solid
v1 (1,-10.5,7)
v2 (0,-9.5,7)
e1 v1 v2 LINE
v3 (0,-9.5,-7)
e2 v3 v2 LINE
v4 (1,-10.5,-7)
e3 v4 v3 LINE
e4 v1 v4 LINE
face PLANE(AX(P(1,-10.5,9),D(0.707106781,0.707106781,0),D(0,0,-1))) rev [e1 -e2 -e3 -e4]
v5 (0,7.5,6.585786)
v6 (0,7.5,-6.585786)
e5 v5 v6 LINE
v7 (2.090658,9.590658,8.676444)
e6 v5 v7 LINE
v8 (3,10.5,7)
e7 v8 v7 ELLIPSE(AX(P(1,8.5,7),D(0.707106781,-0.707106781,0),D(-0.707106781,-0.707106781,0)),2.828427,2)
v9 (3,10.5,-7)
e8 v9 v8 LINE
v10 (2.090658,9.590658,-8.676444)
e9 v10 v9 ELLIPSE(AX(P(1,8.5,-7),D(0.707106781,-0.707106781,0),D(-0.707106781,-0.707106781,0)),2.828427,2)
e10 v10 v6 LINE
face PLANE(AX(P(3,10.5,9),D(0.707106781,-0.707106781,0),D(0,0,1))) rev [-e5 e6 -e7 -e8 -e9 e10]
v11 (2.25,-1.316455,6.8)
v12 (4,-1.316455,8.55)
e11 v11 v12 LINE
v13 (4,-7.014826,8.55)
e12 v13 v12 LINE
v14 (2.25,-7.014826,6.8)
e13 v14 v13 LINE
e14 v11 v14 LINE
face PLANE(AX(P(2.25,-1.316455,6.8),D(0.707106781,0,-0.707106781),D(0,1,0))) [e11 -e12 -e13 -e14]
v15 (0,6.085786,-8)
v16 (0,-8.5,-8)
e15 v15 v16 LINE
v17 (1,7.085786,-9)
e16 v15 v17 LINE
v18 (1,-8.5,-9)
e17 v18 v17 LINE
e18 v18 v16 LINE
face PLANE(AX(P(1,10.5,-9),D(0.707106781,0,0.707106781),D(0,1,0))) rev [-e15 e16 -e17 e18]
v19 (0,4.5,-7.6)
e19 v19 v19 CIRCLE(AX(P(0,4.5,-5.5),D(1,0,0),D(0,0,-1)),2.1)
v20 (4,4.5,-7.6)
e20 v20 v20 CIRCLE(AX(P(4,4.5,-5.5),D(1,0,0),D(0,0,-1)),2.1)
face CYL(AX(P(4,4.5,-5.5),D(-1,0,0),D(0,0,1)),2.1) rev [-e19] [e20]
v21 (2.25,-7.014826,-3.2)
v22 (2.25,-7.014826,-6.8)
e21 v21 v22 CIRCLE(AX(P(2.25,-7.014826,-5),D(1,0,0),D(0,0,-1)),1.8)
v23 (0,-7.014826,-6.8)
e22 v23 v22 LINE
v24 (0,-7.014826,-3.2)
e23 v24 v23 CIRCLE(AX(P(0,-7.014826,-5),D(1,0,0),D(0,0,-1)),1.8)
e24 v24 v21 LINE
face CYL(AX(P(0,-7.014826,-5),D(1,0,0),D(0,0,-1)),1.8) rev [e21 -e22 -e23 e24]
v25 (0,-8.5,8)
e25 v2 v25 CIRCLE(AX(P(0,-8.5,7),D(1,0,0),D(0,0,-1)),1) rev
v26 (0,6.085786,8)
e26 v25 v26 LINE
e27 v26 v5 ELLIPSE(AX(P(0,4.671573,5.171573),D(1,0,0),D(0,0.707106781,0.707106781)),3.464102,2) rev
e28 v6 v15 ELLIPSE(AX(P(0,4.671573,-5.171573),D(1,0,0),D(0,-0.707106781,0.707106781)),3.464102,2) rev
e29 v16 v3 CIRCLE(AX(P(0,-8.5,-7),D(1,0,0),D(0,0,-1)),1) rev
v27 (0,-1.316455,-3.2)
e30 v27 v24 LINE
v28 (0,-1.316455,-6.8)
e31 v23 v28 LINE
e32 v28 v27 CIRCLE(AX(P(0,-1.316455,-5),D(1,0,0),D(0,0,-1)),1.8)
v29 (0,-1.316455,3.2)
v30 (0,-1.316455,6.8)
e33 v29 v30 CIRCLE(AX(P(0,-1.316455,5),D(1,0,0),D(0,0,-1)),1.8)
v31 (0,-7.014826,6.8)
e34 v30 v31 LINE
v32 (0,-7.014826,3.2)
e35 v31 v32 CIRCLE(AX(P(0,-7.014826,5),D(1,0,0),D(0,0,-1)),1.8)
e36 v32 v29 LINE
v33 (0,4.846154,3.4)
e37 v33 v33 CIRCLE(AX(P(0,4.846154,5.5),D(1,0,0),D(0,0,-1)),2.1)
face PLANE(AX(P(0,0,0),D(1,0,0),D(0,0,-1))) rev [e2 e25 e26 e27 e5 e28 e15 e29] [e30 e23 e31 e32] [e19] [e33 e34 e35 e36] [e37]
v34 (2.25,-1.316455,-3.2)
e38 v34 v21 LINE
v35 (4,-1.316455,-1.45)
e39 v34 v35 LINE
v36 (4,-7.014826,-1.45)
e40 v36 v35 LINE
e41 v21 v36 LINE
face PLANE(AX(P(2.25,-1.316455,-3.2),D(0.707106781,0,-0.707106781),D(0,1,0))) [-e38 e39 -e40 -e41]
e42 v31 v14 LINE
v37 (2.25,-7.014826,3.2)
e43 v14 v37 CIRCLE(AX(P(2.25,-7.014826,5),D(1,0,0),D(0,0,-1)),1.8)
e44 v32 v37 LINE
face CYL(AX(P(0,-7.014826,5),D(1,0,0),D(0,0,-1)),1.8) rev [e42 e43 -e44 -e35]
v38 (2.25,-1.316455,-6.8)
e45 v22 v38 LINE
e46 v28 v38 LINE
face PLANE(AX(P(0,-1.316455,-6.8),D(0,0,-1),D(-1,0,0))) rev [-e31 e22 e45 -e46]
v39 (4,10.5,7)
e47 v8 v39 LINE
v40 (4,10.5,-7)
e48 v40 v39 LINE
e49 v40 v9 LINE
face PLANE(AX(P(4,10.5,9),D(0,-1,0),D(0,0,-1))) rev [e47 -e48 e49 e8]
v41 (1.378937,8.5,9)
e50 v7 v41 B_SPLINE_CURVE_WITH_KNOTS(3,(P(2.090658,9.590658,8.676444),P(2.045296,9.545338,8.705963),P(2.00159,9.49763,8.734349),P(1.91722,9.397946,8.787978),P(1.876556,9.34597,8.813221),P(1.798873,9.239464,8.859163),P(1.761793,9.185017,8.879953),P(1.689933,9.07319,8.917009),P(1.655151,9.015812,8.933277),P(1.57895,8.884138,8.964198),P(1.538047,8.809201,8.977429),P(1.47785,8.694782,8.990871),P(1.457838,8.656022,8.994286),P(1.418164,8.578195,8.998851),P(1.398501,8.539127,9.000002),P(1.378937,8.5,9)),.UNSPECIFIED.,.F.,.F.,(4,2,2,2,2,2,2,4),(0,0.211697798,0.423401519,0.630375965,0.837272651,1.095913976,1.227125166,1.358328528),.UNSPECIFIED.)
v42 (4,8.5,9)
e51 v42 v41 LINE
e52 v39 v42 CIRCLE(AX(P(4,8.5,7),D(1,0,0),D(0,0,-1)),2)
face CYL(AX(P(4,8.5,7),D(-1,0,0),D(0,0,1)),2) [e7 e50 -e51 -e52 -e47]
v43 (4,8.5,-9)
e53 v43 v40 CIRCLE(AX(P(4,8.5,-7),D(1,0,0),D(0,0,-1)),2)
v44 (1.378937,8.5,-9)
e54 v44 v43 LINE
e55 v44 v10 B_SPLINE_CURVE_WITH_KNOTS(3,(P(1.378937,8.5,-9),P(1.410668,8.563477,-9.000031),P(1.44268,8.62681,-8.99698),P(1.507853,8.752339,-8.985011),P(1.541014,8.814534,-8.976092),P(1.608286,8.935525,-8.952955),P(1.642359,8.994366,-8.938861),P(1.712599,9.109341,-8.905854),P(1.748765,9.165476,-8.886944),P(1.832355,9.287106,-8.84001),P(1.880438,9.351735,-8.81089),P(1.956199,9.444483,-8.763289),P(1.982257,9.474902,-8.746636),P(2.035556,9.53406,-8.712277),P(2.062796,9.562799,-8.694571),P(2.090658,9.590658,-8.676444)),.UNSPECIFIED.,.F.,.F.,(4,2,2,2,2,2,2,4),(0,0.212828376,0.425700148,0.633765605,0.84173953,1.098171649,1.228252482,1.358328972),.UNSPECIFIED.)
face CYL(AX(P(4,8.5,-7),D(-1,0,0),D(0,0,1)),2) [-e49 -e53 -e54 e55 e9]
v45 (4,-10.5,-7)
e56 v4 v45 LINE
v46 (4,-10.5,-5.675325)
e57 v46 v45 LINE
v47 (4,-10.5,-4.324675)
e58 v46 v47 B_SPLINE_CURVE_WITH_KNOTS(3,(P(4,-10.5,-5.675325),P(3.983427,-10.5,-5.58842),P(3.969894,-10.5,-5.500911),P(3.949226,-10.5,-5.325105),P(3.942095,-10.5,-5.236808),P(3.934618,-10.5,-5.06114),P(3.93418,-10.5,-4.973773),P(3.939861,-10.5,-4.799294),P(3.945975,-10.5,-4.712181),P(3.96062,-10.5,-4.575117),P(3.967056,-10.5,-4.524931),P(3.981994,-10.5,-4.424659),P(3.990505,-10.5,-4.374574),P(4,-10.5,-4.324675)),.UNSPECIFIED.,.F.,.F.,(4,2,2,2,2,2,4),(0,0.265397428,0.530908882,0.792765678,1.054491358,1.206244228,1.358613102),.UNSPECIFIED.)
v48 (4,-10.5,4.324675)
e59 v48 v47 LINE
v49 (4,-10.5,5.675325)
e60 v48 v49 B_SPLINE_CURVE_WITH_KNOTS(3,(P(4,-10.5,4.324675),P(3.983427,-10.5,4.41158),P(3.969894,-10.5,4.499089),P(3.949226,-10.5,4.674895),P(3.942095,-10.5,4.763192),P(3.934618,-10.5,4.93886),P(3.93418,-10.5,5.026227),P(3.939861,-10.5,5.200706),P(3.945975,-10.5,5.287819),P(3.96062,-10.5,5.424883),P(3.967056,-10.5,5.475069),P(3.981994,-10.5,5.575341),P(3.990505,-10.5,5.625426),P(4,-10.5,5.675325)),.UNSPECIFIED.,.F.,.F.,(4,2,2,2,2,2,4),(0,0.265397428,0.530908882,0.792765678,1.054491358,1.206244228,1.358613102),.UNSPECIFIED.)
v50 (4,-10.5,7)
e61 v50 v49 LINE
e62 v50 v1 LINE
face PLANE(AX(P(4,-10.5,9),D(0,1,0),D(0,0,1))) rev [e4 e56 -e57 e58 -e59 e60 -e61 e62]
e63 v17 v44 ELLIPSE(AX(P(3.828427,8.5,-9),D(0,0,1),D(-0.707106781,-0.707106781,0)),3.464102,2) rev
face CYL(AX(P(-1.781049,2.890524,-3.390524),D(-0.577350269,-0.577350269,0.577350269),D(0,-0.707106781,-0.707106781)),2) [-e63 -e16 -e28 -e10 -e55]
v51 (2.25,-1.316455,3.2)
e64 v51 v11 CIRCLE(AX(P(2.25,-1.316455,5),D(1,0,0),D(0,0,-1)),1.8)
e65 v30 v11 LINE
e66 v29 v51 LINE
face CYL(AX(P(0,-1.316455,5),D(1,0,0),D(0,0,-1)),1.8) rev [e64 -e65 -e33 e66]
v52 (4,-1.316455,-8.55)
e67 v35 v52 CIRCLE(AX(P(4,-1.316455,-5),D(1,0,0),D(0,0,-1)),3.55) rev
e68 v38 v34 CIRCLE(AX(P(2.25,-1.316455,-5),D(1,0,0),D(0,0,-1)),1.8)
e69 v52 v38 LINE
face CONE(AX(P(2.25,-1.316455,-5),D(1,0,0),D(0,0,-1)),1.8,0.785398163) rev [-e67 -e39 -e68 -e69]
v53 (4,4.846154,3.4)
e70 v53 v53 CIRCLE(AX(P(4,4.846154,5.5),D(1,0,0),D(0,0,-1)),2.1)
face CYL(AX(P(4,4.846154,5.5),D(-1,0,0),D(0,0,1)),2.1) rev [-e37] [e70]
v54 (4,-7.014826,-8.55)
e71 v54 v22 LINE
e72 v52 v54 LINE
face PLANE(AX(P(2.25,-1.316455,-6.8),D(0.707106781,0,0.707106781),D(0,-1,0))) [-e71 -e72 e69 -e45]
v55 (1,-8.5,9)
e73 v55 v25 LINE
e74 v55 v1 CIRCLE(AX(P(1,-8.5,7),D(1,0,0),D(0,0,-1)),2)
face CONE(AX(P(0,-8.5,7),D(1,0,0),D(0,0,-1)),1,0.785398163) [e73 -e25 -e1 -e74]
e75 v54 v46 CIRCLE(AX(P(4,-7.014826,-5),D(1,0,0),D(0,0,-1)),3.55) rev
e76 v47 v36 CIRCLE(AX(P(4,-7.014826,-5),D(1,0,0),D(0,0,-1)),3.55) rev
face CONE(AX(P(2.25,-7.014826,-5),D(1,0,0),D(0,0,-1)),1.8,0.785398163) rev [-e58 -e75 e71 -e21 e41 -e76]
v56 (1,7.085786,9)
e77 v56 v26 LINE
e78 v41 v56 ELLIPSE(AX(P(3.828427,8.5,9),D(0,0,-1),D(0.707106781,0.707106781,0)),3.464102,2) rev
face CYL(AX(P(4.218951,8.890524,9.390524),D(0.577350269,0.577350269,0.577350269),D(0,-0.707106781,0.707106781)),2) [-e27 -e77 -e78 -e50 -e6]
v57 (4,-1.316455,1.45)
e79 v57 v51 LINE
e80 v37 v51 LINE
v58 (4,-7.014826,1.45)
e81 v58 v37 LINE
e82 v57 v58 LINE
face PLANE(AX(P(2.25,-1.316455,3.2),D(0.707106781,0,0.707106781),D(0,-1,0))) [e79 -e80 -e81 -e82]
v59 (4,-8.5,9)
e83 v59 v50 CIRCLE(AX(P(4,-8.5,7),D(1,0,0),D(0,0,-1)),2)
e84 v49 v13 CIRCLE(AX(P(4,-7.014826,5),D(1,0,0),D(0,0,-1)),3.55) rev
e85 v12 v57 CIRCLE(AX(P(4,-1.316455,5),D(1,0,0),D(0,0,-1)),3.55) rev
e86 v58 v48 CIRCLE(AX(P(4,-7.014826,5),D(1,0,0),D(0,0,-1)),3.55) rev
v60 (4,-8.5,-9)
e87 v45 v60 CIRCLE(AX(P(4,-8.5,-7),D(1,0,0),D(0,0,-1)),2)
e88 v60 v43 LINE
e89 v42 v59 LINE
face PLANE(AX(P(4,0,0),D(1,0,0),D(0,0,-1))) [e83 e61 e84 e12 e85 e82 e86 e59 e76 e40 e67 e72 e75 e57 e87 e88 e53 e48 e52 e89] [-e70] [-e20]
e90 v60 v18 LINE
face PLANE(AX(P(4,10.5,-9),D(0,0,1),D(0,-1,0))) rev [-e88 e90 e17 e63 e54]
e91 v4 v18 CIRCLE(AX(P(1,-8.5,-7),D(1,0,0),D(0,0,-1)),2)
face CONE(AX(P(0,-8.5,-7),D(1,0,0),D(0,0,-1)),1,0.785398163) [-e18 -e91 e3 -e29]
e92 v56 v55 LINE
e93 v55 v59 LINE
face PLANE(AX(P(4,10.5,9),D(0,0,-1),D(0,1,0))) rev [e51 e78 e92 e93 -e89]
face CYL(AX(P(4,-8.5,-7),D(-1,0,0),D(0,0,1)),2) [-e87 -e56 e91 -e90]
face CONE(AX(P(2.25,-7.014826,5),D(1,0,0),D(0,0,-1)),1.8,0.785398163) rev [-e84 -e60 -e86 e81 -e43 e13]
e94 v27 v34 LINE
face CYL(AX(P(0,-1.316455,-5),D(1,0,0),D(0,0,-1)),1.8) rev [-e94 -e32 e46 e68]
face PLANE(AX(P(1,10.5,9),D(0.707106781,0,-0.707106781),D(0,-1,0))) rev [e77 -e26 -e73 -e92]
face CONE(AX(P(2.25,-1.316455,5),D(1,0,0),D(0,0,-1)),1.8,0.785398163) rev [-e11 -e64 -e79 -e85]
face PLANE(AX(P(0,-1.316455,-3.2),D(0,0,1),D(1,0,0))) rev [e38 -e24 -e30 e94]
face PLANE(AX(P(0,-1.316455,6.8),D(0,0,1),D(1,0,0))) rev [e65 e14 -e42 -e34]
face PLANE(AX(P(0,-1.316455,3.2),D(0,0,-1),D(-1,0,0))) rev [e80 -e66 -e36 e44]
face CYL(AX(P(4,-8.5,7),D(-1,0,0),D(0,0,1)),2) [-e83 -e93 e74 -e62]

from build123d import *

# Parameters (mm, degrees)
SKETCH1_W           = 18
SKETCH1_H           = 21
SKETCH1_R           = 2.1
BOSS_EXTRUDE1_DEPTH = 4
CUT_EXTRUDE1_DEPTH  = 4
CHAMFER1_SIZE       = 1.75
FILLET1_R           = 2
CHAMFER2_SIZE       = 3
CHAMFER3_SIZE       = 1
FILLET2_R           = 2


with BuildPart() as part:
    # Sketch1 → Boss-Extrude1 (new body)
    with BuildSketch(Plane(origin=(0, 0, 0), x_dir=(0, 0, -1), z_dir=(1, 0, 0))):
        Rectangle(SKETCH1_W, SKETCH1_H)
        with Locations((5.5, 4.5)):
            Circle(SKETCH1_R, mode=Mode.SUBTRACT)
        with Locations((-5.5, 4.846153846)):
            Circle(SKETCH1_R, mode=Mode.SUBTRACT)
    extrude(amount=BOSS_EXTRUDE1_DEPTH)

    # Sketch2 → Cut-Extrude1 (cut)
    with BuildSketch(Plane(origin=(4, 0, 0), x_dir=(0, 0, -1), z_dir=(1, 0, 0))):
        with BuildLine():
            Line((6.8, -1.316455335), (6.8, -7.014826284))
            ThreePointArc((6.8, -7.014826284), (5, -8.814826284), (3.2, -7.014826284))
            Line((3.2, -7.014826284), (3.2, -1.316455335))
            ThreePointArc((3.2, -1.316455335), (5, 0.483544665), (6.8, -1.316455335))
        make_face()
        with BuildLine():
            Line((-3.2, -1.316455335), (-3.2, -7.014826284))
            ThreePointArc((-3.2, -7.014826284), (-5, -8.814826284), (-6.8, -7.014826284))
            Line((-6.8, -7.014826284), (-6.8, -1.316455335))
            ThreePointArc((-6.8, -1.316455335), (-5, 0.483544665), (-3.2, -1.316455335))
        make_face()
    extrude(amount=-CUT_EXTRUDE1_DEPTH, mode=Mode.SUBTRACT)

    # Chamfer1
    # the kernel refuses this chamfer: 1.75 mm, written as the material it takes off along each edge
    with BuildSketch(Plane(origin=(4, -1.316455335, -5), x_dir=(0, 0, 1), z_dir=(0, -1, 0))) as chamfer1_piece_1:
        Polygon((1.8 + CHAMFER1_SIZE, 0), (1.8, CHAMFER1_SIZE), (1.8, 0), align=None)
    revolve(axis=Axis((4, -1.316455335, -5), (-1, 0, 0)), revolution_arc=180, mode=Mode.SUBTRACT)
    with BuildSketch(Plane(origin=(4, -7.014826284, -3.2), x_dir=(0.02749587661058661, 0, 0.9996219169112968), z_dir=(0, 1, 0)), Plane(origin=(4, -1.316455335, -6.8), x_dir=(0.027495876610586112, 0, -0.9996219169112968), z_dir=(0, -1, 0)), Plane(origin=(4, -7.014826284, 6.8), x_dir=(0.02749587661058662, 0, 0.9996219169112968), z_dir=(0, 1, 0)), Plane(origin=(4, -1.316455335, 3.2), x_dir=(0.02749587661058661, 0, -0.9996219169112968), z_dir=(0, -1, 0))) as chamfer1_piece_2:
        Polygon((CHAMFER1_SIZE * 0.999621916911, -CHAMFER1_SIZE * 0.0274958766106), (-CHAMFER1_SIZE * 0.0274958766106, -CHAMFER1_SIZE * 0.999621916911), (0, 0), align=None)
    extrude(amount=5.698370949, mode=Mode.SUBTRACT)
    with BuildSketch(Plane(origin=(4, -7.014826284, -5), x_dir=(0, 0, -1), z_dir=(0, 1, 0))) as chamfer1_piece_3:
        Polygon((1.8 + CHAMFER1_SIZE, 0), (1.8, CHAMFER1_SIZE), (1.8, 0), align=None)
    revolve(axis=Axis((4, -7.014826284, -5), (-1, 0, 0)), revolution_arc=180, mode=Mode.SUBTRACT)
    with BuildSketch(Plane(origin=(4, -1.316455335, 5), x_dir=(0, 0, 1), z_dir=(0, -1, 0))) as chamfer1_piece_4:
        Polygon((1.8 + CHAMFER1_SIZE, 0), (1.8, CHAMFER1_SIZE), (1.8, 0), align=None)
    revolve(axis=Axis((4, -1.316455335, 5), (-1, 0, 0)), revolution_arc=180, mode=Mode.SUBTRACT)
    with BuildSketch(Plane(origin=(4, -7.014826284, 5), x_dir=(0, 0, -1), z_dir=(0, 1, 0))) as chamfer1_piece_5:
        Polygon((1.8 + CHAMFER1_SIZE, 0), (1.8, CHAMFER1_SIZE), (1.8, 0), align=None)
    revolve(axis=Axis((4, -7.014826284, 5), (-1, 0, 0)), revolution_arc=180, mode=Mode.SUBTRACT)

    # Fillet1
    fillet1_edges = [part.edges().sort_by_distance(p)[0] for p in [
        (2, -10.5, -9),
        (2, -10.5, 9),
        (2, 10.5, 9),
        (2, 10.5, -9),
    ]]
    fillet(fillet1_edges, radius=FILLET1_R)

    # Chamfer2
    # the kernel refuses this chamfer: 3 mm, written as the material it takes off along each edge
    with BuildSketch(Plane(origin=(0, 10.5, 14.715048964), x_dir=(0.9996219169112968, 0.027495876610586202, 0), z_dir=(0, 0, -1))) as chamfer2_piece_1:
        Polygon((CHAMFER2_SIZE * 0.999621916911, CHAMFER2_SIZE * 0.0274958766106), (-CHAMFER2_SIZE * 0.0274958766106, CHAMFER2_SIZE * 0.999621916911), (0, 0), align=None)
    extrude(amount=29.430097928, mode=Mode.SUBTRACT)

    # Chamfer3
    chamfer3_edges = [part.edges().sort_by_distance(p)[0] for p in [
        (0, -0.5, -9),
        (0, -9.914213562, -8.414213562),
        (0, -10.5, 0),
        (0, -9.914213562, 8.414213562),
        (0, -0.5, 9),
    ]]
    chamfer(chamfer3_edges, length=CHAMFER3_SIZE)

    # Fillet2
    fillet2_edges = [part.edges().sort_by_distance(p)[0] for p in [
        (0.5, 8, -8.5),
        (0.5, 8, 8.5),
    ]]
    fillet(fillet2_edges, radius=FILLET2_R)


solid = part.part
